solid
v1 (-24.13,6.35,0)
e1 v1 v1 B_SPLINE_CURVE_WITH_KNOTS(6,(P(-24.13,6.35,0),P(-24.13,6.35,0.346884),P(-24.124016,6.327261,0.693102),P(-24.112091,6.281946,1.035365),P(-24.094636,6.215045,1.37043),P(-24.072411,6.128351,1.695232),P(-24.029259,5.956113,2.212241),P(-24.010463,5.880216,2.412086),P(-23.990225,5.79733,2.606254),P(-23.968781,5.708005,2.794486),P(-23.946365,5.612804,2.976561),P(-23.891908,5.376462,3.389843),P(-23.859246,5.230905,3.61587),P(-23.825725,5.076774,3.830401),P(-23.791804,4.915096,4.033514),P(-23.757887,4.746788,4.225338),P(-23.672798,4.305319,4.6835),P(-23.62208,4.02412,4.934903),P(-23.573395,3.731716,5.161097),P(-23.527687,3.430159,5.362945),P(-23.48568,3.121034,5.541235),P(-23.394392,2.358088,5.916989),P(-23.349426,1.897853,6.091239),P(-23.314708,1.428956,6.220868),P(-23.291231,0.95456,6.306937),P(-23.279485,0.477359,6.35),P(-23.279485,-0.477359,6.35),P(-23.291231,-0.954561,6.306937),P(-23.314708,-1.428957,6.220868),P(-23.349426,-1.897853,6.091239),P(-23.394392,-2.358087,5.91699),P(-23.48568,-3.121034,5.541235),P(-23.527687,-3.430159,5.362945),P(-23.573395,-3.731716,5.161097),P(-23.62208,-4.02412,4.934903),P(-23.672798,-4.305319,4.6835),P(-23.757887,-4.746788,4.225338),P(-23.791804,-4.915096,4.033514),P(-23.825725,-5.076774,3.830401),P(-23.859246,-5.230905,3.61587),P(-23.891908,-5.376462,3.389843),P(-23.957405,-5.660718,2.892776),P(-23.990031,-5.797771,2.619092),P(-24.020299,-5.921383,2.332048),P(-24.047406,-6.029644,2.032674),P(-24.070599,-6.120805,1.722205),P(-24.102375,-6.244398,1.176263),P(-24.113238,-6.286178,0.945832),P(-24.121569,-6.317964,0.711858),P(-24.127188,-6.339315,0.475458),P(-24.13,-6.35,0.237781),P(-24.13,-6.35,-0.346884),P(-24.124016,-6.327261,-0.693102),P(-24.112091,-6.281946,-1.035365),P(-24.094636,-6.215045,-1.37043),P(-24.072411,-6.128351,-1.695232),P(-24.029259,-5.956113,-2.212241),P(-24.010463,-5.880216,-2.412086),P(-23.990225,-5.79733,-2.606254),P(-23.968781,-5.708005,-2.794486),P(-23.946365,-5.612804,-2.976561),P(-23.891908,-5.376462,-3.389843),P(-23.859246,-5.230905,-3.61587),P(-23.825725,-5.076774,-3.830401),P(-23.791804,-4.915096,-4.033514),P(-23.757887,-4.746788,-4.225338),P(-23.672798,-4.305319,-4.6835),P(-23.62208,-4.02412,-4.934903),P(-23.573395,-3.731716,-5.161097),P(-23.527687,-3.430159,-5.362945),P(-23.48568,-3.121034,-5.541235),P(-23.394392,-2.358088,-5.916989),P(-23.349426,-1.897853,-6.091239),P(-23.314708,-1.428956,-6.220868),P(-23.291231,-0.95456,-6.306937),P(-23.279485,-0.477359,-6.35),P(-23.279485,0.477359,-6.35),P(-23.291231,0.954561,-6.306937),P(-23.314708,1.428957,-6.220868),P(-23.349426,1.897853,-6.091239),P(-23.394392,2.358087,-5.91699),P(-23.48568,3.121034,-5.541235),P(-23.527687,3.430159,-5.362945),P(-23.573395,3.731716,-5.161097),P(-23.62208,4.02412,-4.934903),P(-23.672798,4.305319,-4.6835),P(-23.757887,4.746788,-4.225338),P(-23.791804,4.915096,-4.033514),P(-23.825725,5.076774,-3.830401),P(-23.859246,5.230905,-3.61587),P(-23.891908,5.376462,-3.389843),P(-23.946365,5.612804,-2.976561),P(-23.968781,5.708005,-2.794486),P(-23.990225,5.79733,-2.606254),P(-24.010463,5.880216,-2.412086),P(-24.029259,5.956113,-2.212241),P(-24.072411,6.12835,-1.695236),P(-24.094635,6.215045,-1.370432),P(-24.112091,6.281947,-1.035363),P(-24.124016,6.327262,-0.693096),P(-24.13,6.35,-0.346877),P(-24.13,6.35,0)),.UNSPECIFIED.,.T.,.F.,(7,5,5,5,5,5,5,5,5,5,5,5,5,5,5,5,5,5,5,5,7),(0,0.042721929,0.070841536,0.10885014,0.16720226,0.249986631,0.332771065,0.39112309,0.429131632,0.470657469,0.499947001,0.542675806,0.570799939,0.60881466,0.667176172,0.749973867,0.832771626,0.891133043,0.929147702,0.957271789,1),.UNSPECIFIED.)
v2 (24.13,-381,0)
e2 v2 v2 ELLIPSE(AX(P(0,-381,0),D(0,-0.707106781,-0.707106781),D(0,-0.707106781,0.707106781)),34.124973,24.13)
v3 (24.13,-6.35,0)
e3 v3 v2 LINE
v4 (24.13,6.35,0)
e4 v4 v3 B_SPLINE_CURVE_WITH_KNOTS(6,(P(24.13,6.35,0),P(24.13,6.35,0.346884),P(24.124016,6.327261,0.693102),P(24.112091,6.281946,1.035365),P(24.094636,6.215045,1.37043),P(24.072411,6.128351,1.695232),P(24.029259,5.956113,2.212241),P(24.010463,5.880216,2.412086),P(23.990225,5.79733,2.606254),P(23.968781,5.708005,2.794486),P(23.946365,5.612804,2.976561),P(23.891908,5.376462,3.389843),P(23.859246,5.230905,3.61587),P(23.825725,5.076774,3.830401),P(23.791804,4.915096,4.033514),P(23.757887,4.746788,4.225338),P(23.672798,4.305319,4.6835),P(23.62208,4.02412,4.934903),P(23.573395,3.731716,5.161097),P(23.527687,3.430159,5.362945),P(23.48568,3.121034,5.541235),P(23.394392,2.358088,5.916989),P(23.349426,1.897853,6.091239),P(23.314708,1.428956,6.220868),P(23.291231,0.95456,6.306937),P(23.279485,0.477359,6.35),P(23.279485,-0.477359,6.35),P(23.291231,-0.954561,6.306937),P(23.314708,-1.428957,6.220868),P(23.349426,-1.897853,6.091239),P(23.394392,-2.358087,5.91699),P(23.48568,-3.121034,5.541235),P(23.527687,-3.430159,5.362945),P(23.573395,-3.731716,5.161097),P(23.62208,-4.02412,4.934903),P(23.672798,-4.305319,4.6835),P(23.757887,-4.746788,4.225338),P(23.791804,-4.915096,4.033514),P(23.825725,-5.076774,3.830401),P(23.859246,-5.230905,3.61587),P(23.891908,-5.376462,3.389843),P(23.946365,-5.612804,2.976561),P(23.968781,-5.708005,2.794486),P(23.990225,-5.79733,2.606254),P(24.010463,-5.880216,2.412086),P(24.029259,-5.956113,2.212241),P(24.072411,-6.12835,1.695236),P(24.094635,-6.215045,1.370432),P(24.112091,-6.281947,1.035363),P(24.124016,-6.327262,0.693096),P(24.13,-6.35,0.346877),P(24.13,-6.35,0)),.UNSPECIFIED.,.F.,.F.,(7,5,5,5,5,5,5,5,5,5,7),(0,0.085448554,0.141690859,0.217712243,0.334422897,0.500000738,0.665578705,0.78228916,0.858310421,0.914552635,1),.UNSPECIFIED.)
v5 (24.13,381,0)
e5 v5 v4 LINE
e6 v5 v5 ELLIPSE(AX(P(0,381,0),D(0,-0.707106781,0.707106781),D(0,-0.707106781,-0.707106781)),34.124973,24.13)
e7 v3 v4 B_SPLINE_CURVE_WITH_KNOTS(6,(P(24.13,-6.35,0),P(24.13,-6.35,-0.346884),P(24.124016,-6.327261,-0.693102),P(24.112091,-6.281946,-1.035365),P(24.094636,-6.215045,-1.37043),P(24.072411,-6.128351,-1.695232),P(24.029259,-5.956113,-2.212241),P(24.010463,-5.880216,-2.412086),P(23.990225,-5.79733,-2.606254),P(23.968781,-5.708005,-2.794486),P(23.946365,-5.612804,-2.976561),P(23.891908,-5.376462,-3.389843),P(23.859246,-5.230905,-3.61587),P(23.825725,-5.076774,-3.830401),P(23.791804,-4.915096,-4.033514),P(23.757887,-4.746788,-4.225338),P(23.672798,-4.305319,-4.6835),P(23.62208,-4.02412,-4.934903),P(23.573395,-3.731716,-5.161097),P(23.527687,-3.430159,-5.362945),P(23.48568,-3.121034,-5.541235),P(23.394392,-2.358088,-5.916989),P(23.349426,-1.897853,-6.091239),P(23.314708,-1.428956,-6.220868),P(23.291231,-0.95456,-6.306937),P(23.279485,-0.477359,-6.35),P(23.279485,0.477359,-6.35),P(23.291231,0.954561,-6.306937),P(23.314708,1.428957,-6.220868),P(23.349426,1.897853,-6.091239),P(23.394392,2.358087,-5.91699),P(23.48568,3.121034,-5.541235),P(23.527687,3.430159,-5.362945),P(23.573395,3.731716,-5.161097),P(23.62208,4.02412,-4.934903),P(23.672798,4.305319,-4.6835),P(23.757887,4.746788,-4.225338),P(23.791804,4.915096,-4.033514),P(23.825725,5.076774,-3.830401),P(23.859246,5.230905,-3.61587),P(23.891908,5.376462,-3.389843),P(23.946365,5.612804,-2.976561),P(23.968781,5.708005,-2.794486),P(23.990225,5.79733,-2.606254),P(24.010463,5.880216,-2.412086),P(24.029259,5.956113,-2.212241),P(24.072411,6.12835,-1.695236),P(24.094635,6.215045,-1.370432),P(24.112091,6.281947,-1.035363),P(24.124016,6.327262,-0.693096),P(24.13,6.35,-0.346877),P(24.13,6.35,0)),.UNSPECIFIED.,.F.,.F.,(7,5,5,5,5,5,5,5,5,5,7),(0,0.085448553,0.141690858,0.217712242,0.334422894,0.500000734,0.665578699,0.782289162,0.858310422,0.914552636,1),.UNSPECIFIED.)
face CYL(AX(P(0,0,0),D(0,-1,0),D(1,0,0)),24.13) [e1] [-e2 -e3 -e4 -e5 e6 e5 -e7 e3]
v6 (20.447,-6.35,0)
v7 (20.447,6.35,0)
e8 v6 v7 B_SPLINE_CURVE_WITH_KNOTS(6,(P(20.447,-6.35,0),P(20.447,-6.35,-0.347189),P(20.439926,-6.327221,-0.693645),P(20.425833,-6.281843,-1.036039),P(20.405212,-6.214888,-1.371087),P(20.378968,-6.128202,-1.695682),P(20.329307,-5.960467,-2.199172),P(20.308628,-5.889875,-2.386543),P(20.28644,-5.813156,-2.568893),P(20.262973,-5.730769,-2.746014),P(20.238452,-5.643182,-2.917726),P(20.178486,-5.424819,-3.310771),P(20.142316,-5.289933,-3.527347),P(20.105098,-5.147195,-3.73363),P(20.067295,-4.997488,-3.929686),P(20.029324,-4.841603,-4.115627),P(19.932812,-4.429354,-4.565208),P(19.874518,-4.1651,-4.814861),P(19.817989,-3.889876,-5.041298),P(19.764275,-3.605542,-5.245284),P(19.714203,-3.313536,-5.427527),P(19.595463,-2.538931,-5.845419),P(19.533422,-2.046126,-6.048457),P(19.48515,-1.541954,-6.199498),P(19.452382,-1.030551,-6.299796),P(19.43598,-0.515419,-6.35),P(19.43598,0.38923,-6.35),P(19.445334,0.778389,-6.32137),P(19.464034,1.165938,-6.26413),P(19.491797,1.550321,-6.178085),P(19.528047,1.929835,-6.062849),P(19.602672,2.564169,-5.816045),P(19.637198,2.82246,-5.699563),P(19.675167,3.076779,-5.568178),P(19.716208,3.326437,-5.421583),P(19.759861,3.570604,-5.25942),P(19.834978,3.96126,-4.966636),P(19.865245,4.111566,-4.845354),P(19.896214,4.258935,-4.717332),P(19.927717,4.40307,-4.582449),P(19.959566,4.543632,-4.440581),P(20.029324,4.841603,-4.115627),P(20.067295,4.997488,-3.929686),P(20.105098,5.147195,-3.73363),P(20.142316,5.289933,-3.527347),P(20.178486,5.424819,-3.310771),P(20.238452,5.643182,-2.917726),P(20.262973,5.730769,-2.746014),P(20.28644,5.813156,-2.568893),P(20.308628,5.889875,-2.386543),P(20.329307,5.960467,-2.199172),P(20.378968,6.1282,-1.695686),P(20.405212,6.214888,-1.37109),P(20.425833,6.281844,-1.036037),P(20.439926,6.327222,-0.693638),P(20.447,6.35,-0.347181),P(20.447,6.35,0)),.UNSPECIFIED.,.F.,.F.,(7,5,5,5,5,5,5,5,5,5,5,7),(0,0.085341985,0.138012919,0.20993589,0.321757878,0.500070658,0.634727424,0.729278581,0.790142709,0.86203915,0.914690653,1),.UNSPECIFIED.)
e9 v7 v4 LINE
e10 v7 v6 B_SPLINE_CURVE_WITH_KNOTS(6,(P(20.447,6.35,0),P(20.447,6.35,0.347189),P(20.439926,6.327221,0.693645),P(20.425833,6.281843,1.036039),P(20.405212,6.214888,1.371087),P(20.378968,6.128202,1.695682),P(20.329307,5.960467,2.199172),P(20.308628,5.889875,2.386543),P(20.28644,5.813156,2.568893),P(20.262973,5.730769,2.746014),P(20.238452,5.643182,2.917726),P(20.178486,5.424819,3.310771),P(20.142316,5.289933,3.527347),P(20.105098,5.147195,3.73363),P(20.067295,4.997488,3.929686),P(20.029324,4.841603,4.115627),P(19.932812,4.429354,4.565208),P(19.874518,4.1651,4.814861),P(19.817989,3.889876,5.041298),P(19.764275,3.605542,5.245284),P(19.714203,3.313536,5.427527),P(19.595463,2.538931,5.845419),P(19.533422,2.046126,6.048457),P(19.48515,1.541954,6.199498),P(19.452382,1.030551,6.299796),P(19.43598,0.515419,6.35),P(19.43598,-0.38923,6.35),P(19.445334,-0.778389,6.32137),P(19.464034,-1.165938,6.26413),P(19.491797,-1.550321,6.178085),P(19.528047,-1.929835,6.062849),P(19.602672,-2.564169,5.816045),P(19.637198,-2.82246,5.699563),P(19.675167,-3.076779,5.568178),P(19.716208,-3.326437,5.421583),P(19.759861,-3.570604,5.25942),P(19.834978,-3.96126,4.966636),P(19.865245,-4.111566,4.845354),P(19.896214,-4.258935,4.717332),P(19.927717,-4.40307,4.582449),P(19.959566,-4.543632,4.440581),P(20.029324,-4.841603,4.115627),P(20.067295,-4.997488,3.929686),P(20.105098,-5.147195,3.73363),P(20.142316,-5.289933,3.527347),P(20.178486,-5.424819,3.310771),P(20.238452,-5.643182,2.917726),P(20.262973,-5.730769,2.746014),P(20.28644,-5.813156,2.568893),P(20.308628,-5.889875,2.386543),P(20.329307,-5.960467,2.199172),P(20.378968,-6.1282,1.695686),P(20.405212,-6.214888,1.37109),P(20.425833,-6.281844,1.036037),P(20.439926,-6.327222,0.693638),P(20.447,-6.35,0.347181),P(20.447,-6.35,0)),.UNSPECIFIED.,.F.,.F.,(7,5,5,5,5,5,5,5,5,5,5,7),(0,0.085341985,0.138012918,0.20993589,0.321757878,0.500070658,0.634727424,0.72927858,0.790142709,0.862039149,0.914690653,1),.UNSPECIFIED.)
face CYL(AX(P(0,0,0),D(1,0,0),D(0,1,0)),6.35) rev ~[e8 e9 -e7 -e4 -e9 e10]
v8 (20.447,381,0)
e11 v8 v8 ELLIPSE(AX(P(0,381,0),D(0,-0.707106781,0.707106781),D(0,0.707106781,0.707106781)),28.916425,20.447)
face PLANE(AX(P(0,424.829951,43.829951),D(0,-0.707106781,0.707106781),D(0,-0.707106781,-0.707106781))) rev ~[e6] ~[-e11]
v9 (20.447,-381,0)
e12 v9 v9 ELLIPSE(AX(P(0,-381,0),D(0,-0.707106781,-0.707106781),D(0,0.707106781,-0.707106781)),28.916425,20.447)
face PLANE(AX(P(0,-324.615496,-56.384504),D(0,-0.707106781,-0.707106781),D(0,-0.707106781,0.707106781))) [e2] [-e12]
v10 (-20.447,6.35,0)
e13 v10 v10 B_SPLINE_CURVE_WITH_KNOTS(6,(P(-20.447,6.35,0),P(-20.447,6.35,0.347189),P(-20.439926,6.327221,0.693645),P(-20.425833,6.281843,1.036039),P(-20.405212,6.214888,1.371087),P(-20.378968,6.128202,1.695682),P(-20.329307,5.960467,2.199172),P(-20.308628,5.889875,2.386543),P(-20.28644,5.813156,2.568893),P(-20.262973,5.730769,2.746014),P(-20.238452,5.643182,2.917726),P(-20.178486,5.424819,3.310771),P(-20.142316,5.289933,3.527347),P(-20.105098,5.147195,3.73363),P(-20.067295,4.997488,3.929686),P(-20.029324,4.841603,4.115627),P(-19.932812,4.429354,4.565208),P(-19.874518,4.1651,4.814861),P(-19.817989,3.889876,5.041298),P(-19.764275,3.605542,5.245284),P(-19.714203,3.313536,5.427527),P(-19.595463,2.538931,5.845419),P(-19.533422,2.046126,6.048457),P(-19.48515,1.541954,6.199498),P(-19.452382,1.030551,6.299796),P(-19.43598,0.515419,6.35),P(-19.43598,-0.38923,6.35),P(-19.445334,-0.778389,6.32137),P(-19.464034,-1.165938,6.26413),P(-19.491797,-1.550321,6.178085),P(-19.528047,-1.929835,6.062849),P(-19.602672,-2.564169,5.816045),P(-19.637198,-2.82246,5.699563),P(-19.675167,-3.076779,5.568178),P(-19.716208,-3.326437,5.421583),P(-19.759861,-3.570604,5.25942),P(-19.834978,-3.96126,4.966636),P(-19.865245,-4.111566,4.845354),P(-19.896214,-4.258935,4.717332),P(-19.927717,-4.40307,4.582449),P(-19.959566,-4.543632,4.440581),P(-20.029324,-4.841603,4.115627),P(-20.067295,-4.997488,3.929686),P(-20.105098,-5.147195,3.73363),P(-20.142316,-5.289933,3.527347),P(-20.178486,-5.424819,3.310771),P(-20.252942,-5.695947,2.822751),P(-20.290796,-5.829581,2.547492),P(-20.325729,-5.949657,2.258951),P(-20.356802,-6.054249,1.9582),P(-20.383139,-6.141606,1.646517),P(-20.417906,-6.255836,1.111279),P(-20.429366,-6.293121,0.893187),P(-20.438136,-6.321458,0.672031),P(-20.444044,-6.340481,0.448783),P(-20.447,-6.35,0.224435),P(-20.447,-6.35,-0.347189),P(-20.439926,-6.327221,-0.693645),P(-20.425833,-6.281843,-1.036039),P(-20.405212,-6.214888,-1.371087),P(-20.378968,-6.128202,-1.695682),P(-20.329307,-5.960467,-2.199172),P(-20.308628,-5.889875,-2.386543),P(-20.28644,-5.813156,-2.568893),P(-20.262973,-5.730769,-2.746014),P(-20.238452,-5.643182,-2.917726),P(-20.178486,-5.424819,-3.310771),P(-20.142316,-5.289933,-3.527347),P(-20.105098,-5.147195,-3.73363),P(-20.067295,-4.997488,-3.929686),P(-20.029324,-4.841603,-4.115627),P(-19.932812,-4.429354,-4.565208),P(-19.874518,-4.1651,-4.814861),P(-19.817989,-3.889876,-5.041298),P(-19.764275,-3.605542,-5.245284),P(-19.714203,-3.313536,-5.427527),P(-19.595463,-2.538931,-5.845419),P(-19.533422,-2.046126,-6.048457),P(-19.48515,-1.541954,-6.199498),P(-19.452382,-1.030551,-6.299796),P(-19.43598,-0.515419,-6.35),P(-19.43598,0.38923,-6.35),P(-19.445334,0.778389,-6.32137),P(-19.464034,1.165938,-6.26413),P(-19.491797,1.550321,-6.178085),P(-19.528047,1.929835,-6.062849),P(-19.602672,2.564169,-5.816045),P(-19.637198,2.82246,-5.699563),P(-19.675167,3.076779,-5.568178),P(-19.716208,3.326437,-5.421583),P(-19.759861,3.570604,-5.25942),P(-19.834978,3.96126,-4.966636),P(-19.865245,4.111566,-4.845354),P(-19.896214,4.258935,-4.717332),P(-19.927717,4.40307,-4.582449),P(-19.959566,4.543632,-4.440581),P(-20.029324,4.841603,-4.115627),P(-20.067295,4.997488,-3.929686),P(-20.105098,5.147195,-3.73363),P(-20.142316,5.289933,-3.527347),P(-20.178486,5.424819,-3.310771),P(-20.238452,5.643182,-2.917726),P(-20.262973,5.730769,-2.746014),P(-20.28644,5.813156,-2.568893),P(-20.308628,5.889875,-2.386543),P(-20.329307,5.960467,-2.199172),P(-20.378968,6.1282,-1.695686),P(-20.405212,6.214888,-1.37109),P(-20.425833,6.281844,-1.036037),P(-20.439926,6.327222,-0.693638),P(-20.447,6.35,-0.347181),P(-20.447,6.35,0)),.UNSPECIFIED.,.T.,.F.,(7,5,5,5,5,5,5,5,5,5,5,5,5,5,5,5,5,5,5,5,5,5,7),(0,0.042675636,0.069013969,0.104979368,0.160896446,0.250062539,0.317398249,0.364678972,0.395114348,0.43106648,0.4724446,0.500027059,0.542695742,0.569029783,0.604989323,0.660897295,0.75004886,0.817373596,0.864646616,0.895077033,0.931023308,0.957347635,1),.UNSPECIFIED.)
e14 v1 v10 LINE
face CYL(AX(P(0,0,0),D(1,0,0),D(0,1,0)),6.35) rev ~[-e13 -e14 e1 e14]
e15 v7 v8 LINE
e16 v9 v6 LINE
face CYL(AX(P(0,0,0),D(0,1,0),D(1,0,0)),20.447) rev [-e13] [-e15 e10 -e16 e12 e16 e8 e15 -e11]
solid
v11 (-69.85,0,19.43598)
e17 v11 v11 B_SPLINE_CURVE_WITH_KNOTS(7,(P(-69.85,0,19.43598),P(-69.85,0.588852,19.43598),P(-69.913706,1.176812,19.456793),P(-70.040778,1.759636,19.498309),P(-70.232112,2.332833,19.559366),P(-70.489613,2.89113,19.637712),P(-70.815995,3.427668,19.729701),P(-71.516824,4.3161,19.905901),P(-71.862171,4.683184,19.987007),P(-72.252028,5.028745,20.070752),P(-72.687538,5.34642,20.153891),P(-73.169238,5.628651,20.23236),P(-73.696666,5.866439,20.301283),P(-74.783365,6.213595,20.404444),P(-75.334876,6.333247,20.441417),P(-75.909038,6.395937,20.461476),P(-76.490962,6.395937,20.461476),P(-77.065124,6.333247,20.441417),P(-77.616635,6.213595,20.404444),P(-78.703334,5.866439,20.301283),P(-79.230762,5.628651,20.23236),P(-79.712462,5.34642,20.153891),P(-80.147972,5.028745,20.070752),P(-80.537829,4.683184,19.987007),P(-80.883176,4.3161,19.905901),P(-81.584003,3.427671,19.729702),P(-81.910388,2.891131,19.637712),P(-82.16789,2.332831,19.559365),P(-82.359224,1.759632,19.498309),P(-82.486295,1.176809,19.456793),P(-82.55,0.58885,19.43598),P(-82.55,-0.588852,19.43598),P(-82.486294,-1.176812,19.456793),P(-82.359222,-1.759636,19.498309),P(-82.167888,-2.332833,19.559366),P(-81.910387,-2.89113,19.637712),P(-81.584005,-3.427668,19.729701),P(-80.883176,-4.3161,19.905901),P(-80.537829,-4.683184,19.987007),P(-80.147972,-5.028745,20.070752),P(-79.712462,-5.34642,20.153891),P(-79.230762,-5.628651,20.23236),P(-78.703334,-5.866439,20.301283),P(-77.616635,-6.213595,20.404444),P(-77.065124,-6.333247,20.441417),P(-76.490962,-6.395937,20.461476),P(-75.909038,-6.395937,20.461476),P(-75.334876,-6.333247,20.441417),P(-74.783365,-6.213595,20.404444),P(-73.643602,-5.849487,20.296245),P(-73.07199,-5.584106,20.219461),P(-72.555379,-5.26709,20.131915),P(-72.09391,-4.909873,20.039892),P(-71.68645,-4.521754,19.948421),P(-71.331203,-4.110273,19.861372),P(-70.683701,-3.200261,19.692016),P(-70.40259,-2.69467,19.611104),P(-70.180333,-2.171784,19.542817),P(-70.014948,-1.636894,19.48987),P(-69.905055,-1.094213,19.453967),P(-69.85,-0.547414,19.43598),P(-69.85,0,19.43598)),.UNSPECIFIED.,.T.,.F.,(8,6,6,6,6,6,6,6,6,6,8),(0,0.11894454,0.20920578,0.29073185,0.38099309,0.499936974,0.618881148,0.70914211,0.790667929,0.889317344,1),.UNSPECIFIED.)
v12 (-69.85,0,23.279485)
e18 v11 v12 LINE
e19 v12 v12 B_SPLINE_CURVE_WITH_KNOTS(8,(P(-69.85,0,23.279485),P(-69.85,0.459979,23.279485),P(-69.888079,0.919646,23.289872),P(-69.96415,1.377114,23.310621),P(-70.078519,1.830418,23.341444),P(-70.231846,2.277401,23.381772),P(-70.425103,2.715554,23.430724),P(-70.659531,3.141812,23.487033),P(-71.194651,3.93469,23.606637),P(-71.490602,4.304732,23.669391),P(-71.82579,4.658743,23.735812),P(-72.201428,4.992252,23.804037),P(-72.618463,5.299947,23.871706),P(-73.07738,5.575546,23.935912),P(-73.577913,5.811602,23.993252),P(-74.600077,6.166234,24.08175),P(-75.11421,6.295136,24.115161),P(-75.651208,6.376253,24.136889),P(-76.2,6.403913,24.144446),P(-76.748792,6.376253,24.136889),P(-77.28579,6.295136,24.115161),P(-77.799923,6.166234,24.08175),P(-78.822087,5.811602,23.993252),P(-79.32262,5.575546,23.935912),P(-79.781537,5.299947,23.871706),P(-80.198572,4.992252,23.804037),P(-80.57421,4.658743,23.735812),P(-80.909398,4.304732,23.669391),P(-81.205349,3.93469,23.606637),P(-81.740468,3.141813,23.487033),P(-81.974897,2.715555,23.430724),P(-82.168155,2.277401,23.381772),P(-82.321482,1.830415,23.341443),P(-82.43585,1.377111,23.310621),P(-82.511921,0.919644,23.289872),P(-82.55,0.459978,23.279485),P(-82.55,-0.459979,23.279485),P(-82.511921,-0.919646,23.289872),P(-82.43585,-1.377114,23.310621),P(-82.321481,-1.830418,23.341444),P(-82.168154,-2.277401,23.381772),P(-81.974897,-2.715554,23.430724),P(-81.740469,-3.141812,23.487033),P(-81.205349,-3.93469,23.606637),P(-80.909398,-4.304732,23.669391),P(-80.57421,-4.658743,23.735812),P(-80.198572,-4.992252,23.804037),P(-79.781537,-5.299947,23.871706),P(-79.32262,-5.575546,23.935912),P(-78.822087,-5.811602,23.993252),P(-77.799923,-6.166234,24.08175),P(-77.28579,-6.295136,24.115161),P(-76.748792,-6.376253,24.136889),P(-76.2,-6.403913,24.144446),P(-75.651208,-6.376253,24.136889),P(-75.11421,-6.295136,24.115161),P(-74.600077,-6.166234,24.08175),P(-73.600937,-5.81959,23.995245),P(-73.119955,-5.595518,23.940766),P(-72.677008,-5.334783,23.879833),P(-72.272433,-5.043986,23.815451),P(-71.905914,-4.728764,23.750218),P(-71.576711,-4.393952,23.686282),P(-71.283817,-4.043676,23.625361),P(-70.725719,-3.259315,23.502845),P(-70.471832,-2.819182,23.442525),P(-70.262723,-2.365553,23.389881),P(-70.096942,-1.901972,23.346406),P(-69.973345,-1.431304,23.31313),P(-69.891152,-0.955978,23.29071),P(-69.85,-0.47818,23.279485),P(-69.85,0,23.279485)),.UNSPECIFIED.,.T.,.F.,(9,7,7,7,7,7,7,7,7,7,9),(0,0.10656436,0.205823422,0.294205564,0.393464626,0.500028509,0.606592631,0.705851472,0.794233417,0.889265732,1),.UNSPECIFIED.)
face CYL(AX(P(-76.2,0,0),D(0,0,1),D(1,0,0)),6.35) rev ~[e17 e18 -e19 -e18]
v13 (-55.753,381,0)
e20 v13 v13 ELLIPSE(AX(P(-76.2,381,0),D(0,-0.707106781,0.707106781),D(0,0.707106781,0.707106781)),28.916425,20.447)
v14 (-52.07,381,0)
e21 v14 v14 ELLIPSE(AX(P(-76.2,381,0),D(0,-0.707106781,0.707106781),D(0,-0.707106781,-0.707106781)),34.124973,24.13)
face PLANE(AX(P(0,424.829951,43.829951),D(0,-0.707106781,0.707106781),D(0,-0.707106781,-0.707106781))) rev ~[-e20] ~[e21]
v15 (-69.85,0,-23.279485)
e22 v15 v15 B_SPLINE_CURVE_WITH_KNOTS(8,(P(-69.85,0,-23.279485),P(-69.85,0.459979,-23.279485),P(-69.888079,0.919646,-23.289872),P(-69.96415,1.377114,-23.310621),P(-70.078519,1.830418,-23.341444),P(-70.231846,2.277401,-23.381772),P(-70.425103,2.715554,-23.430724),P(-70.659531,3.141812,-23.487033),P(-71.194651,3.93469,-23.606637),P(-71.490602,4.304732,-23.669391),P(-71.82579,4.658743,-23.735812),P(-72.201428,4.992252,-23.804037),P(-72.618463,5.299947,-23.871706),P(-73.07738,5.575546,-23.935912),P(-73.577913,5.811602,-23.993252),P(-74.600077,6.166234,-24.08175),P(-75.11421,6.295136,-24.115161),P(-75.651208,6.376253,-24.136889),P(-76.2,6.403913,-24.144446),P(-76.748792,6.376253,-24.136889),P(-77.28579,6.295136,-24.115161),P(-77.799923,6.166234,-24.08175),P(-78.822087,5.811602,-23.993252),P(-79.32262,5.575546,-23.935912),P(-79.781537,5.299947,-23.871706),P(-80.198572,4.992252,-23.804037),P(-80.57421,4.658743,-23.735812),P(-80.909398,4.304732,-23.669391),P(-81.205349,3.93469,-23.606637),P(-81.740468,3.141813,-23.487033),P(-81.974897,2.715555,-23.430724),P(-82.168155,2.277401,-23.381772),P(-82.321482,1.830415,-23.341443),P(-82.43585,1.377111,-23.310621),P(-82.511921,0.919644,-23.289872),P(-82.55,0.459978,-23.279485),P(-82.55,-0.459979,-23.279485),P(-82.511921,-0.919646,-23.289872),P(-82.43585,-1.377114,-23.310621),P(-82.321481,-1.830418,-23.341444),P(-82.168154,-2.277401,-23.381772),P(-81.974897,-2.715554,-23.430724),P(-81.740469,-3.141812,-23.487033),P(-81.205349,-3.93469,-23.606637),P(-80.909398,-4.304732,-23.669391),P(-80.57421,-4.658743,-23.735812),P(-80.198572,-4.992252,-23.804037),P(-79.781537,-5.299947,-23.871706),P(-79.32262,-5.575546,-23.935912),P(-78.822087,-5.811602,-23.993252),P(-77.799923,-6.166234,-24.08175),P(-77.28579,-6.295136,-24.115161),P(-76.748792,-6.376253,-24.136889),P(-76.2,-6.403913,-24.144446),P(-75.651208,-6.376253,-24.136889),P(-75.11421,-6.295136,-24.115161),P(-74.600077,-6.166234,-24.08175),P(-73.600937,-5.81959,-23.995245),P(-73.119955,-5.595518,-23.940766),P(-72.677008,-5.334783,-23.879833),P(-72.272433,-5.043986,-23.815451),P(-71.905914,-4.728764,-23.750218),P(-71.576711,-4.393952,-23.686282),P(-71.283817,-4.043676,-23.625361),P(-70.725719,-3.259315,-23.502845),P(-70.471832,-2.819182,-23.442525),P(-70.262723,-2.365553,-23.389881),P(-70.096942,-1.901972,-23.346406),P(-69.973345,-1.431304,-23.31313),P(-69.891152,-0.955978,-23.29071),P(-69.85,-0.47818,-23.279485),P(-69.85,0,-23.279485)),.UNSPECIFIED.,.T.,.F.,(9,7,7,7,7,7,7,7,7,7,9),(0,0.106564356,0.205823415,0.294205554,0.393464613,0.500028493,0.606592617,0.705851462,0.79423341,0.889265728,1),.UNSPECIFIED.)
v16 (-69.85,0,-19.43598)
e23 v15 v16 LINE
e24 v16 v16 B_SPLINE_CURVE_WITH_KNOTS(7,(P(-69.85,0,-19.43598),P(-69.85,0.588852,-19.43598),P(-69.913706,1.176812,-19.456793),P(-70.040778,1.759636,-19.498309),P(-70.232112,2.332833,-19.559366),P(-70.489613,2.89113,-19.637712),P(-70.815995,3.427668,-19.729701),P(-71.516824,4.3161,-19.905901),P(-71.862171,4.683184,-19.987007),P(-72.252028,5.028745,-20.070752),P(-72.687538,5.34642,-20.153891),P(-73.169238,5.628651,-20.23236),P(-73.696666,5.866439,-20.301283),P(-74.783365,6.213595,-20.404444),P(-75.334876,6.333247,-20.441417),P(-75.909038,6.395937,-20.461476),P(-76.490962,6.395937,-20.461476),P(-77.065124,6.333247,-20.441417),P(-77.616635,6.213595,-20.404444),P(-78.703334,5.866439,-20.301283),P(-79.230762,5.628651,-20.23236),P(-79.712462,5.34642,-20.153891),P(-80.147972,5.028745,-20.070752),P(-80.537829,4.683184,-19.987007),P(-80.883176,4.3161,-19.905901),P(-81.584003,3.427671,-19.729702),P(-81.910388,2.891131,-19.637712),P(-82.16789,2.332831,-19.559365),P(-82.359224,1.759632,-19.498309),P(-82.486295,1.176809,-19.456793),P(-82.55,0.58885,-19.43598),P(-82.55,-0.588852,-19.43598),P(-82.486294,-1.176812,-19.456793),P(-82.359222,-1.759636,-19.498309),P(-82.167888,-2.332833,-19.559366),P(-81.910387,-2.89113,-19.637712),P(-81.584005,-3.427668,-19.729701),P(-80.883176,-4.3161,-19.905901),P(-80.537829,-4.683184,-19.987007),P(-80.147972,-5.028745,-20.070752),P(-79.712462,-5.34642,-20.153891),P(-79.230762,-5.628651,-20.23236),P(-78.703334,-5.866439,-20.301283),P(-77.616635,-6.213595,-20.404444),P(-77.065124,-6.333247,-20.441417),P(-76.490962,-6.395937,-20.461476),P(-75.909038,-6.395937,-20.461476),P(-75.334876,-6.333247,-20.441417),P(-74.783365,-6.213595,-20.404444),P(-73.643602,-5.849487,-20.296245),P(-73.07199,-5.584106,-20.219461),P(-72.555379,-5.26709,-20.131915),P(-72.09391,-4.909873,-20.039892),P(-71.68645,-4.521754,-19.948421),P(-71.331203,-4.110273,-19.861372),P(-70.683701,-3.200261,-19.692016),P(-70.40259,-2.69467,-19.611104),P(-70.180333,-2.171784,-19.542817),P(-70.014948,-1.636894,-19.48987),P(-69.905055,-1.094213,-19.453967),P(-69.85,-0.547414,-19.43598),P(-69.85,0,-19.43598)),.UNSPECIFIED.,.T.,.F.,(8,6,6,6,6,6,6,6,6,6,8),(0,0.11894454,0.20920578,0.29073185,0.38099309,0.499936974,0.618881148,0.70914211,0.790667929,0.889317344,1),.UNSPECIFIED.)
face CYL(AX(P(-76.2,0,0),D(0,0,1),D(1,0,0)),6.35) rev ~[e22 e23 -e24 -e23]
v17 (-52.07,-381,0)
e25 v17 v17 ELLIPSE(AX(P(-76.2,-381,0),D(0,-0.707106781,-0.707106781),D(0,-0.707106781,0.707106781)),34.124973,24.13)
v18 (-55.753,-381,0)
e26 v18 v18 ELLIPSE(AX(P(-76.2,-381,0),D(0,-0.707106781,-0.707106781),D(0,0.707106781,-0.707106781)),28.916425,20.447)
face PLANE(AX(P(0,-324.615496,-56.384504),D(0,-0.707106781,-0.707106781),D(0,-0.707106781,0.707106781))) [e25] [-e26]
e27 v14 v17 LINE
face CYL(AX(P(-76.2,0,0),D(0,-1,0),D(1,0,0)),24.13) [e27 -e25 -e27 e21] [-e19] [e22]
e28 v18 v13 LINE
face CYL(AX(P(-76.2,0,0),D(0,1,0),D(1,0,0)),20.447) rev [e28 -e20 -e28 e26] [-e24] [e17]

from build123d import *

# Parameters (mm, degrees)
F0_R     = 24.13
F0_R_2   = 20.447
F1_DEPTH = 431.8
F2_R     = 24.13
F2_R_2   = 20.447
F3_DEPTH = 457.2
F5_DEPTH = 152.4
F6_R     = 6.35
F7_DEPTH = 76.2
F8_R     = 6.35
F9_DEPTH = 76.2


with BuildPart() as f1:
    # F0 (on Front) → F1 (new body, symmetric)
    with BuildSketch(Plane.XZ):
        Circle(F0_R)
        Circle(F0_R_2, mode=Mode.SUBTRACT)
    extrude(amount=F1_DEPTH, both=True)


with BuildPart() as f3:
    # F2 (on Front) → F3 (new body, symmetric)
    with BuildSketch(Plane.XZ):
        with Locations((-76.2, 0)):
            Circle(F2_R)
        with Locations((-76.2, 0)):
            Circle(F2_R_2, mode=Mode.SUBTRACT)
    extrude(amount=F3_DEPTH, both=True)


with BuildPart() as f5_tool:
    # F4 (on Right) → F5 (new body, symmetric)
    with BuildSketch(Plane.YZ):
        Polygon((-424.8299507257, 43.8299507257), (-462.2847161403, 104.5060300127), (-486.3353615056, -36.4805202162), (-324.6154958919, -56.3845041081), (-381, 0), align=None)
        Polygon((462.2847161403, 104.5060300127), (424.8299507257, 43.8299507257), (381, 0), (324.6154958919, -56.3845041081), (486.3353615056, -36.4805202162), align=None)
    extrude(amount=F5_DEPTH, both=True)


with BuildPart() as f1_1:
    add(f1.part)

    # F5: cut by f5_tool
    add(f5_tool.part, mode=Mode.SUBTRACT)

    # F6 (on Right) → F7 (cut, symmetric)
    with BuildSketch(Plane.YZ):
        Circle(F6_R)
    extrude(amount=F7_DEPTH, both=True, mode=Mode.SUBTRACT)


with BuildPart() as f3_1:
    add(f3.part)

    # F5: cut by f5_tool
    add(f5_tool.part, mode=Mode.SUBTRACT)

    # F8 (on Top) → F9 (cut, symmetric)
    with BuildSketch(Plane.XY):
        with Locations((-76.2, 0)):
            Circle(F8_R)
    extrude(amount=F9_DEPTH, both=True, mode=Mode.SUBTRACT)


solid = Compound([f1_1.part, f3_1.part])
